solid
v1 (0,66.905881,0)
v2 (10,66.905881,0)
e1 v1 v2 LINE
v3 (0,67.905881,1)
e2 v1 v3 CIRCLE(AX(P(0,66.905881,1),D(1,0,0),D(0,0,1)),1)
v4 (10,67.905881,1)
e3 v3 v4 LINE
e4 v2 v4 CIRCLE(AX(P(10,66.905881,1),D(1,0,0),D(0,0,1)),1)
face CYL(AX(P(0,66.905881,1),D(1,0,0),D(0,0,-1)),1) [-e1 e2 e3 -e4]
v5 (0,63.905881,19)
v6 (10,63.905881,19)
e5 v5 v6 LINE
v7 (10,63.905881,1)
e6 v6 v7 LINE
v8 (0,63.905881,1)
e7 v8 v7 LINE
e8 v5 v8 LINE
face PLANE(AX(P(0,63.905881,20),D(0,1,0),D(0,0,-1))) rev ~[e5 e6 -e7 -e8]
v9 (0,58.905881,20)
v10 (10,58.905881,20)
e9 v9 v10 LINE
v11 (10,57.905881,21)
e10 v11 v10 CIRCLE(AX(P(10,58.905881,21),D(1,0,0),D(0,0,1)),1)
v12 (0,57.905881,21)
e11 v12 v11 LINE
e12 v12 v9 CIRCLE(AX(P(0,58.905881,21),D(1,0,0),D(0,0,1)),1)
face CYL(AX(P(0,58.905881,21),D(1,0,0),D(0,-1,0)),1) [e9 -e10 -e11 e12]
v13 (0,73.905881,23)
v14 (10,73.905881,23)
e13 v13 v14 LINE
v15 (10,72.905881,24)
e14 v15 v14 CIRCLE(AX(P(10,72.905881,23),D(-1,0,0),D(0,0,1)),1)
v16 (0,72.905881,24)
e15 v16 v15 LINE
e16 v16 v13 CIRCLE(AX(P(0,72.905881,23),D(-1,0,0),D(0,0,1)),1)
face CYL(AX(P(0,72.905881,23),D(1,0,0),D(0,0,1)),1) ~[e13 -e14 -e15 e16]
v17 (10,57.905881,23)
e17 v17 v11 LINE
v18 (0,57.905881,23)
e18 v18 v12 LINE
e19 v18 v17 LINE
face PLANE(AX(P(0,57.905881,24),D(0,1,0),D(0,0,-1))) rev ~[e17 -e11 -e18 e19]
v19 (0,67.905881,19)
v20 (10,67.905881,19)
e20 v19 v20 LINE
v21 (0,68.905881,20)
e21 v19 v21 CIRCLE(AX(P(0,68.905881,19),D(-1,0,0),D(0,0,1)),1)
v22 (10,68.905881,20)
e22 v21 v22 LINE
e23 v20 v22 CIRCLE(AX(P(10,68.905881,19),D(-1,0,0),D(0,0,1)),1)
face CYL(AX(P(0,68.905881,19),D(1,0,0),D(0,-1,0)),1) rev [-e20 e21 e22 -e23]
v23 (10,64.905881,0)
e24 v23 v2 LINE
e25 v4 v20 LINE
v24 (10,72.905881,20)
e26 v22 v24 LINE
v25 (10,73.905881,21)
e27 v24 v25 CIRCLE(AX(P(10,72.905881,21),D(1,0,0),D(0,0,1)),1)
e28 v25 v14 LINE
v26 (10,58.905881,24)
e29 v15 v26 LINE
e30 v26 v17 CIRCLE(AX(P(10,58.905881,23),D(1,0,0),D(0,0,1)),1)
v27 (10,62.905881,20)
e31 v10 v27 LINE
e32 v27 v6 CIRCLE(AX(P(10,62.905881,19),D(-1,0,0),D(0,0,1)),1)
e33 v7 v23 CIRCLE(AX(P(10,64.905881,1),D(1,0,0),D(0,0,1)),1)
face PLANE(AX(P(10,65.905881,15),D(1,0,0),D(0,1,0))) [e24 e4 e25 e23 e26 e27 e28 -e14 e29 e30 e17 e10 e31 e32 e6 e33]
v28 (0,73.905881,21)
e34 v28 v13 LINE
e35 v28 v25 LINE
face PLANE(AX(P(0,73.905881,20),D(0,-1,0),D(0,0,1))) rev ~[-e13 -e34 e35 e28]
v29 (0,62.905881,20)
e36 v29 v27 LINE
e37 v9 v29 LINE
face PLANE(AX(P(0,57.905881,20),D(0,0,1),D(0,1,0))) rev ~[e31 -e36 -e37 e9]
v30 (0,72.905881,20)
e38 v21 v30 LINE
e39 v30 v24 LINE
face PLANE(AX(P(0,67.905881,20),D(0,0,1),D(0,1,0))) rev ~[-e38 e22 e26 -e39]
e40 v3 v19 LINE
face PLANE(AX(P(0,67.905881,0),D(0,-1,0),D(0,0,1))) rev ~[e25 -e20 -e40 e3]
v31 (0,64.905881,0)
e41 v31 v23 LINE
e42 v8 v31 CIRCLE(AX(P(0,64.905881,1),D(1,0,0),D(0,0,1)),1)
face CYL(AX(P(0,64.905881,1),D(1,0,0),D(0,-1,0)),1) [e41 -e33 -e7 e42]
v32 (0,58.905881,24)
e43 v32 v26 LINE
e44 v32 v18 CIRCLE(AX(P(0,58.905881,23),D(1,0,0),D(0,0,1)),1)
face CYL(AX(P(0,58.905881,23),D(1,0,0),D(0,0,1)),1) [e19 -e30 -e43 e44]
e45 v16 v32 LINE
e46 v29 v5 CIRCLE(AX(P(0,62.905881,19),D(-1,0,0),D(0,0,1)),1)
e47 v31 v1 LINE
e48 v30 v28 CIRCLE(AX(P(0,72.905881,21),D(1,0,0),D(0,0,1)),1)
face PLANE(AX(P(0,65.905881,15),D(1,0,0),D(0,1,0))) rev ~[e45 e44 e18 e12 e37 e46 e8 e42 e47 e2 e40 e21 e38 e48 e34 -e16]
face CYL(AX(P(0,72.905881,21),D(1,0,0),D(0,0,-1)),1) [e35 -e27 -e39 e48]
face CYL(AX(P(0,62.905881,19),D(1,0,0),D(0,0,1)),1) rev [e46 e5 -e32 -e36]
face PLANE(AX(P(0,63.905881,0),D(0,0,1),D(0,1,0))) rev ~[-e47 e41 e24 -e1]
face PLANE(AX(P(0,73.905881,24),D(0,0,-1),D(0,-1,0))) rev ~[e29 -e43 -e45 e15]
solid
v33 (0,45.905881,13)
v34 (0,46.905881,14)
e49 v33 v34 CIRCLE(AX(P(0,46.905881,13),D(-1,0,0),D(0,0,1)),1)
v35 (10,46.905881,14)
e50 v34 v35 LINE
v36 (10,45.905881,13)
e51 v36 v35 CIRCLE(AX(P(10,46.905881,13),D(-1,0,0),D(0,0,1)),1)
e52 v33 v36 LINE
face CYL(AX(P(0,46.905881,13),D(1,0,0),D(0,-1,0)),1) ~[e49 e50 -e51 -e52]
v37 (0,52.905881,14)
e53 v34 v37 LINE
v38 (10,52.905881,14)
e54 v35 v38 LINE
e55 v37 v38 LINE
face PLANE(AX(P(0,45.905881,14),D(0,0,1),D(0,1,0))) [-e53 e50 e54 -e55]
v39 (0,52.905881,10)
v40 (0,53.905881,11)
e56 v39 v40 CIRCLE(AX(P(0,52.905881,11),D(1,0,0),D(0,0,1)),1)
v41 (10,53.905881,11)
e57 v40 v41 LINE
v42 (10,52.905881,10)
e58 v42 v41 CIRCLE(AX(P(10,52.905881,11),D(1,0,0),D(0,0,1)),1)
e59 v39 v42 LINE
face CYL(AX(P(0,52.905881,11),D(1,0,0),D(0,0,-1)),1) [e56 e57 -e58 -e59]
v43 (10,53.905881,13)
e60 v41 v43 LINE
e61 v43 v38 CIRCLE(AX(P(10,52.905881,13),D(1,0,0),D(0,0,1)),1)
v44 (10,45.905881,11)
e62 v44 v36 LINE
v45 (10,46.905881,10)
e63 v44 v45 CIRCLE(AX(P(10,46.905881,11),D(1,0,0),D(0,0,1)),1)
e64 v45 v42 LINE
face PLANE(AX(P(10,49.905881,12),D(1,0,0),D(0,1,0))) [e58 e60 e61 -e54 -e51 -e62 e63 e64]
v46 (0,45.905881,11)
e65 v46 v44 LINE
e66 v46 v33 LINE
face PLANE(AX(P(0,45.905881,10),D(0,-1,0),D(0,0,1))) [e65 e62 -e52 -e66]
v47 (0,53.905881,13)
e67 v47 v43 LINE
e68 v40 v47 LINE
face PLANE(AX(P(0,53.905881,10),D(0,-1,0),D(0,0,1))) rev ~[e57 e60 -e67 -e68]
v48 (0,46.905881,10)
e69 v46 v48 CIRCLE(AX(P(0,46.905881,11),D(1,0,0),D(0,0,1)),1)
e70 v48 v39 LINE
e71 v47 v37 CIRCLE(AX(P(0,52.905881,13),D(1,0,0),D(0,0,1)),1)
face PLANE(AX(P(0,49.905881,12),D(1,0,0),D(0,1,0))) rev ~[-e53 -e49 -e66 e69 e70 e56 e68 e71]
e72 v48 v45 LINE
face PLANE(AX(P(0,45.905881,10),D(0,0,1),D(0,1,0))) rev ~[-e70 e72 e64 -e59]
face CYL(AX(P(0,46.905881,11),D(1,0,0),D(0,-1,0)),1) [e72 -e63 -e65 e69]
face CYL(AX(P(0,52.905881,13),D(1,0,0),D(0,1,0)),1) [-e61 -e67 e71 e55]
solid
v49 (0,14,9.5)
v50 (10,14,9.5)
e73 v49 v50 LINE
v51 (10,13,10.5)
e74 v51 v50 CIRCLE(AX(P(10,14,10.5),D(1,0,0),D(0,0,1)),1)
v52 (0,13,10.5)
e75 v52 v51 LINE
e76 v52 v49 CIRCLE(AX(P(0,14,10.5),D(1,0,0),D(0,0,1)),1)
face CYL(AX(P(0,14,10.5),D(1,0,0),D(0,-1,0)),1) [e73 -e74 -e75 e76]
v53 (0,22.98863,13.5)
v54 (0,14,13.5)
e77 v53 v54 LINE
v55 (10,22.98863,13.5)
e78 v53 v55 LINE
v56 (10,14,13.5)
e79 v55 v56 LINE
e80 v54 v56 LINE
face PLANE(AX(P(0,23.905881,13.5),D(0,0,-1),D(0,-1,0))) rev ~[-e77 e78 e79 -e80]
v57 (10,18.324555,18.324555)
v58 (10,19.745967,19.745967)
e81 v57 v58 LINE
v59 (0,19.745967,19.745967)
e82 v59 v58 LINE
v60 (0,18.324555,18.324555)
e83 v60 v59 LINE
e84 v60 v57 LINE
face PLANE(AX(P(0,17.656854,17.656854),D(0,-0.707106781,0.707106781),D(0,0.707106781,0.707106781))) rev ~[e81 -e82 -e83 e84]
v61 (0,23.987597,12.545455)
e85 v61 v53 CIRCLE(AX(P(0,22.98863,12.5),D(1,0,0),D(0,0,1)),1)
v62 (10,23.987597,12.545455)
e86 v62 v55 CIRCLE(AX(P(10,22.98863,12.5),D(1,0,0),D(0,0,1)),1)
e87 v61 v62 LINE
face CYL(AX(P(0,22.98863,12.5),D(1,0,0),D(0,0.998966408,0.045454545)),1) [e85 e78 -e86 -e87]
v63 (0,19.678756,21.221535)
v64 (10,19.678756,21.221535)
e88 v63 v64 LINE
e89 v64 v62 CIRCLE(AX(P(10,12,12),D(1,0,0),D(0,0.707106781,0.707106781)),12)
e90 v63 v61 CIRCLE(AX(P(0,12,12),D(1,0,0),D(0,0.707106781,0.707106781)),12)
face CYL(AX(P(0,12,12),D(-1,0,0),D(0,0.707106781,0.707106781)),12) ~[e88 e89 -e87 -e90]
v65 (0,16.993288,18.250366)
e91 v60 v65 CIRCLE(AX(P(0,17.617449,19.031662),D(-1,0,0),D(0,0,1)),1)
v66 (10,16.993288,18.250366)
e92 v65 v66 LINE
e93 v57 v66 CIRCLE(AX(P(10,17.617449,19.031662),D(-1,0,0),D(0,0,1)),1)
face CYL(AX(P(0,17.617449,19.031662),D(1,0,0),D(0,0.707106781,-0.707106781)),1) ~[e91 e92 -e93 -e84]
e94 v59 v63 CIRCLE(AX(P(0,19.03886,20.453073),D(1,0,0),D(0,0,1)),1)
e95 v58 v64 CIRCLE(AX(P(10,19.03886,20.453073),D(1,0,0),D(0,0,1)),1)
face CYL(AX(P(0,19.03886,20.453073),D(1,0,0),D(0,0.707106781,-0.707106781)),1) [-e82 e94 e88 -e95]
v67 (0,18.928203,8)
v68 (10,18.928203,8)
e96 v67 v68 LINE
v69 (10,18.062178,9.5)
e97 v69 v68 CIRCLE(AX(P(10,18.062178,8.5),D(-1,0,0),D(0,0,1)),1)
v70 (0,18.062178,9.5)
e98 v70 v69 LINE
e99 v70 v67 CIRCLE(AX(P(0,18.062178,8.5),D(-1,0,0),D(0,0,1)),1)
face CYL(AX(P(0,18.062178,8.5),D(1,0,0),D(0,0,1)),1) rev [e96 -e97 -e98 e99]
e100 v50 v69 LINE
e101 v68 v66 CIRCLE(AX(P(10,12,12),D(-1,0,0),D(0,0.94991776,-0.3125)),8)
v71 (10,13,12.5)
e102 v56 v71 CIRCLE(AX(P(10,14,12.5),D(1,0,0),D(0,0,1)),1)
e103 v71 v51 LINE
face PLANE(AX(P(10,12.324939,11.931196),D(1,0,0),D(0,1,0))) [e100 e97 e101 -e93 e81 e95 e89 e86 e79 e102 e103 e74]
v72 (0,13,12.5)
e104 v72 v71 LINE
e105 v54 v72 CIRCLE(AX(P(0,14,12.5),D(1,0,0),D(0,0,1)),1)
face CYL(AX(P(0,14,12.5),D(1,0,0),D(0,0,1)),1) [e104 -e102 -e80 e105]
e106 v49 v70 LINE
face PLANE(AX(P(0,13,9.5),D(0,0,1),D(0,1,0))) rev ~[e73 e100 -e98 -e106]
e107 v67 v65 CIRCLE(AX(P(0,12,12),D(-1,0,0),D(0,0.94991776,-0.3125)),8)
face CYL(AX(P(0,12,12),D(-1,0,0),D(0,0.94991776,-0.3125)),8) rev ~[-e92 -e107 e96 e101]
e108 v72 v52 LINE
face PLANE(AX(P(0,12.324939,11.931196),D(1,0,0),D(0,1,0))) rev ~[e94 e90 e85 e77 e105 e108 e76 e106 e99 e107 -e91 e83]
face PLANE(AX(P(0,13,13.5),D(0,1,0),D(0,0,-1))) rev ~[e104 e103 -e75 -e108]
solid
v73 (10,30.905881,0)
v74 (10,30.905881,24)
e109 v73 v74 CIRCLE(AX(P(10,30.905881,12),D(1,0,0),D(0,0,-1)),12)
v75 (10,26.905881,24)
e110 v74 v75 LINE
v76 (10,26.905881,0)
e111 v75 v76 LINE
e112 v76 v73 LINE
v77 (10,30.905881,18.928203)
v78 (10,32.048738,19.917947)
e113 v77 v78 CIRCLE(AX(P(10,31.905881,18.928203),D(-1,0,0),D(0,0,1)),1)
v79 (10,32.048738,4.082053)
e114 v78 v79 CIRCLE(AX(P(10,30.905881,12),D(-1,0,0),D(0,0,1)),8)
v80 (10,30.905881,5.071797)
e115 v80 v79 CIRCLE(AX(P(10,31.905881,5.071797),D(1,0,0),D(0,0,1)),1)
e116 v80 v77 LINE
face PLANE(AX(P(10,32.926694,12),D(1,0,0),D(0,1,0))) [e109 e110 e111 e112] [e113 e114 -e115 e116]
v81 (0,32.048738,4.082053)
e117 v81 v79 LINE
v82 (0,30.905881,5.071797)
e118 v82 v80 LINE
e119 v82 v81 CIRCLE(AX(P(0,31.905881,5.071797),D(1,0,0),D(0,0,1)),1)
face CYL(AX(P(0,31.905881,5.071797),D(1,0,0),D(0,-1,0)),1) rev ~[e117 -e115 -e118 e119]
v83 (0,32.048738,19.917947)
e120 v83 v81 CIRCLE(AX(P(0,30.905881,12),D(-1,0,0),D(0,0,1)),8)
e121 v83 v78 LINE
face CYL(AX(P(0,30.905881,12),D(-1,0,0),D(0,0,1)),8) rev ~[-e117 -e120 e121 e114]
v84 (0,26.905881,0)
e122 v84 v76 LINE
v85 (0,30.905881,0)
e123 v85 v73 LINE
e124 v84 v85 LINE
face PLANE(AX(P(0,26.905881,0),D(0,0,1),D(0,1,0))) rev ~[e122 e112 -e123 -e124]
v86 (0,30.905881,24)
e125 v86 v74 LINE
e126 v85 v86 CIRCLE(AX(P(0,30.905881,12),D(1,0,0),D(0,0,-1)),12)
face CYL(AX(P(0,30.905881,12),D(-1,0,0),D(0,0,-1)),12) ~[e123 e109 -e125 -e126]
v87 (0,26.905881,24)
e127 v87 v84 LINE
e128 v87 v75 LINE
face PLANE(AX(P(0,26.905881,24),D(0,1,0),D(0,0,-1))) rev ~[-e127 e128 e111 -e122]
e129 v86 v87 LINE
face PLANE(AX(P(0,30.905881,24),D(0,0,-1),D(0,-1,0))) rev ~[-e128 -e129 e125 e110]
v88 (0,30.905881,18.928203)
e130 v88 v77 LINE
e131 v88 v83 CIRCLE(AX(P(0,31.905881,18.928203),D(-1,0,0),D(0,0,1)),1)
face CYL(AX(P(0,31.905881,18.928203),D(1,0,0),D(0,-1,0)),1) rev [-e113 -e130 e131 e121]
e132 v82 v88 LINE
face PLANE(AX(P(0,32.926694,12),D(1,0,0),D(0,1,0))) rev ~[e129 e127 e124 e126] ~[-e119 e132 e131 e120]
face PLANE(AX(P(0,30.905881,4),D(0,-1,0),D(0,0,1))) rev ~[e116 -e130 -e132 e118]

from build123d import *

# Parameters (mm, degrees)
F1_DEPTH = 10
F0_W     = 8
F0_H     = 4
F2_R     = 1
F3_R     = 1
F4_R     = 1
F4_2_R   = 1
F4_3_R   = 1


with BuildPart() as f1:
    # F0 (on Right) → F1 (new body)
    with BuildSketch(Plane.YZ):
        with BuildLine():
            Line((17.6568542495, 17.6568542495), (20.4852813742, 20.4852813742))
            ThreePointArc((20.4852813742, 20.4852813742), (1.2227826555, 6.7225397861), (23.9058808998, 13.5))
            Line((23.9058808998, 13.5), (13, 13.5))
            Line((13, 13.5), (13, 9.5))
            Line((13, 9.5), (19.5993420768, 9.5))
            ThreePointArc((19.5993420768, 9.5), (4.217631911, 10.1466929753), (17.6568542495, 17.6568542495))
        make_face()
    extrude(amount=F1_DEPTH)

    # F3
    f3_edges = [f1.edges().sort_by_distance(p)[0] for p in [
        (5, 19.599342, 9.5),
        (5, 13, 9.5),
        (5, 13, 13.5),
        (5, 23.905881, 13.5),
        (5, 20.485281, 20.485281),
        (5, 17.656854, 17.656854),
    ]]
    fillet(f3_edges, radius=F3_R)


with BuildPart() as f1b:
    # F0 (on Right) → F1, piece 2 (new body)
    with BuildSketch(Plane.YZ):
        with BuildLine():
            Line((26.9058808998, 0), (30.9058808998, 0))
            ThreePointArc((30.9058808998, 0), (42.9058808998, 12), (30.9058808998, 24))
            Line((30.9058808998, 24), (26.9058808998, 24))
            Line((26.9058808998, 24), (26.9058808998, 0))
        make_face()
        with BuildLine():
            ThreePointArc((30.9058808998, 20), (38.9058808998, 12), (30.9058808998, 4))
            Line((30.9058808998, 4), (30.9058808998, 20))
        make_face(mode=Mode.SUBTRACT)
    extrude(amount=F1_DEPTH)

    # F2
    f2_edges = [f1b.edges().sort_by_distance(p)[0] for p in [
        (5, 30.905881, 4),
    ]]
    fillet(f2_edges, radius=F2_R)

    # F4#3
    f4_3_edges = [f1b.edges().sort_by_distance(p)[0] for p in [
        (5, 30.905881, 20),
    ]]
    fillet(f4_3_edges, radius=F4_3_R)


with BuildPart() as f1c:
    # F0 (on Right) → F1, piece 3 (new body)
    with BuildSketch(Plane.YZ):
        with Locations((49.9058808998, 12)):
            Rectangle(F0_W, F0_H)
    extrude(amount=F1_DEPTH)

    # F4
    f4_edges = [f1c.edges().sort_by_distance(p)[0] for p in [
        (5, 53.905881, 14),
        (5, 45.905881, 14),
        (5, 53.905881, 10),
        (5, 45.905881, 10),
    ]]
    fillet(f4_edges, radius=F4_R)


with BuildPart() as f1d:
    # F0 (on Right) → F1, piece 4 (new body)
    with BuildSketch(Plane.YZ):
        Polygon((73.9058808998, 24), (57.9058808998, 24), (57.9058808998, 20), (63.9058808998, 20), (63.9058808998, 0), (67.9058808998, 0), (67.9058808998, 20), (73.9058808998, 20), align=None)
    extrude(amount=F1_DEPTH)

    # F4#2
    f4_2_edges = [f1d.edges().sort_by_distance(p)[0] for p in [
        (5, 67.905881, 20),
        (5, 63.905881, 20),
        (5, 57.905881, 20),
        (5, 57.905881, 24),
        (5, 73.905881, 24),
        (5, 73.905881, 20),
        (5, 67.905881, 0),
        (5, 63.905881, 0),
    ]]
    fillet(f4_2_edges, radius=F4_2_R)


solid = Compound([f1.part, f1b.part, f1c.part, f1d.part])
